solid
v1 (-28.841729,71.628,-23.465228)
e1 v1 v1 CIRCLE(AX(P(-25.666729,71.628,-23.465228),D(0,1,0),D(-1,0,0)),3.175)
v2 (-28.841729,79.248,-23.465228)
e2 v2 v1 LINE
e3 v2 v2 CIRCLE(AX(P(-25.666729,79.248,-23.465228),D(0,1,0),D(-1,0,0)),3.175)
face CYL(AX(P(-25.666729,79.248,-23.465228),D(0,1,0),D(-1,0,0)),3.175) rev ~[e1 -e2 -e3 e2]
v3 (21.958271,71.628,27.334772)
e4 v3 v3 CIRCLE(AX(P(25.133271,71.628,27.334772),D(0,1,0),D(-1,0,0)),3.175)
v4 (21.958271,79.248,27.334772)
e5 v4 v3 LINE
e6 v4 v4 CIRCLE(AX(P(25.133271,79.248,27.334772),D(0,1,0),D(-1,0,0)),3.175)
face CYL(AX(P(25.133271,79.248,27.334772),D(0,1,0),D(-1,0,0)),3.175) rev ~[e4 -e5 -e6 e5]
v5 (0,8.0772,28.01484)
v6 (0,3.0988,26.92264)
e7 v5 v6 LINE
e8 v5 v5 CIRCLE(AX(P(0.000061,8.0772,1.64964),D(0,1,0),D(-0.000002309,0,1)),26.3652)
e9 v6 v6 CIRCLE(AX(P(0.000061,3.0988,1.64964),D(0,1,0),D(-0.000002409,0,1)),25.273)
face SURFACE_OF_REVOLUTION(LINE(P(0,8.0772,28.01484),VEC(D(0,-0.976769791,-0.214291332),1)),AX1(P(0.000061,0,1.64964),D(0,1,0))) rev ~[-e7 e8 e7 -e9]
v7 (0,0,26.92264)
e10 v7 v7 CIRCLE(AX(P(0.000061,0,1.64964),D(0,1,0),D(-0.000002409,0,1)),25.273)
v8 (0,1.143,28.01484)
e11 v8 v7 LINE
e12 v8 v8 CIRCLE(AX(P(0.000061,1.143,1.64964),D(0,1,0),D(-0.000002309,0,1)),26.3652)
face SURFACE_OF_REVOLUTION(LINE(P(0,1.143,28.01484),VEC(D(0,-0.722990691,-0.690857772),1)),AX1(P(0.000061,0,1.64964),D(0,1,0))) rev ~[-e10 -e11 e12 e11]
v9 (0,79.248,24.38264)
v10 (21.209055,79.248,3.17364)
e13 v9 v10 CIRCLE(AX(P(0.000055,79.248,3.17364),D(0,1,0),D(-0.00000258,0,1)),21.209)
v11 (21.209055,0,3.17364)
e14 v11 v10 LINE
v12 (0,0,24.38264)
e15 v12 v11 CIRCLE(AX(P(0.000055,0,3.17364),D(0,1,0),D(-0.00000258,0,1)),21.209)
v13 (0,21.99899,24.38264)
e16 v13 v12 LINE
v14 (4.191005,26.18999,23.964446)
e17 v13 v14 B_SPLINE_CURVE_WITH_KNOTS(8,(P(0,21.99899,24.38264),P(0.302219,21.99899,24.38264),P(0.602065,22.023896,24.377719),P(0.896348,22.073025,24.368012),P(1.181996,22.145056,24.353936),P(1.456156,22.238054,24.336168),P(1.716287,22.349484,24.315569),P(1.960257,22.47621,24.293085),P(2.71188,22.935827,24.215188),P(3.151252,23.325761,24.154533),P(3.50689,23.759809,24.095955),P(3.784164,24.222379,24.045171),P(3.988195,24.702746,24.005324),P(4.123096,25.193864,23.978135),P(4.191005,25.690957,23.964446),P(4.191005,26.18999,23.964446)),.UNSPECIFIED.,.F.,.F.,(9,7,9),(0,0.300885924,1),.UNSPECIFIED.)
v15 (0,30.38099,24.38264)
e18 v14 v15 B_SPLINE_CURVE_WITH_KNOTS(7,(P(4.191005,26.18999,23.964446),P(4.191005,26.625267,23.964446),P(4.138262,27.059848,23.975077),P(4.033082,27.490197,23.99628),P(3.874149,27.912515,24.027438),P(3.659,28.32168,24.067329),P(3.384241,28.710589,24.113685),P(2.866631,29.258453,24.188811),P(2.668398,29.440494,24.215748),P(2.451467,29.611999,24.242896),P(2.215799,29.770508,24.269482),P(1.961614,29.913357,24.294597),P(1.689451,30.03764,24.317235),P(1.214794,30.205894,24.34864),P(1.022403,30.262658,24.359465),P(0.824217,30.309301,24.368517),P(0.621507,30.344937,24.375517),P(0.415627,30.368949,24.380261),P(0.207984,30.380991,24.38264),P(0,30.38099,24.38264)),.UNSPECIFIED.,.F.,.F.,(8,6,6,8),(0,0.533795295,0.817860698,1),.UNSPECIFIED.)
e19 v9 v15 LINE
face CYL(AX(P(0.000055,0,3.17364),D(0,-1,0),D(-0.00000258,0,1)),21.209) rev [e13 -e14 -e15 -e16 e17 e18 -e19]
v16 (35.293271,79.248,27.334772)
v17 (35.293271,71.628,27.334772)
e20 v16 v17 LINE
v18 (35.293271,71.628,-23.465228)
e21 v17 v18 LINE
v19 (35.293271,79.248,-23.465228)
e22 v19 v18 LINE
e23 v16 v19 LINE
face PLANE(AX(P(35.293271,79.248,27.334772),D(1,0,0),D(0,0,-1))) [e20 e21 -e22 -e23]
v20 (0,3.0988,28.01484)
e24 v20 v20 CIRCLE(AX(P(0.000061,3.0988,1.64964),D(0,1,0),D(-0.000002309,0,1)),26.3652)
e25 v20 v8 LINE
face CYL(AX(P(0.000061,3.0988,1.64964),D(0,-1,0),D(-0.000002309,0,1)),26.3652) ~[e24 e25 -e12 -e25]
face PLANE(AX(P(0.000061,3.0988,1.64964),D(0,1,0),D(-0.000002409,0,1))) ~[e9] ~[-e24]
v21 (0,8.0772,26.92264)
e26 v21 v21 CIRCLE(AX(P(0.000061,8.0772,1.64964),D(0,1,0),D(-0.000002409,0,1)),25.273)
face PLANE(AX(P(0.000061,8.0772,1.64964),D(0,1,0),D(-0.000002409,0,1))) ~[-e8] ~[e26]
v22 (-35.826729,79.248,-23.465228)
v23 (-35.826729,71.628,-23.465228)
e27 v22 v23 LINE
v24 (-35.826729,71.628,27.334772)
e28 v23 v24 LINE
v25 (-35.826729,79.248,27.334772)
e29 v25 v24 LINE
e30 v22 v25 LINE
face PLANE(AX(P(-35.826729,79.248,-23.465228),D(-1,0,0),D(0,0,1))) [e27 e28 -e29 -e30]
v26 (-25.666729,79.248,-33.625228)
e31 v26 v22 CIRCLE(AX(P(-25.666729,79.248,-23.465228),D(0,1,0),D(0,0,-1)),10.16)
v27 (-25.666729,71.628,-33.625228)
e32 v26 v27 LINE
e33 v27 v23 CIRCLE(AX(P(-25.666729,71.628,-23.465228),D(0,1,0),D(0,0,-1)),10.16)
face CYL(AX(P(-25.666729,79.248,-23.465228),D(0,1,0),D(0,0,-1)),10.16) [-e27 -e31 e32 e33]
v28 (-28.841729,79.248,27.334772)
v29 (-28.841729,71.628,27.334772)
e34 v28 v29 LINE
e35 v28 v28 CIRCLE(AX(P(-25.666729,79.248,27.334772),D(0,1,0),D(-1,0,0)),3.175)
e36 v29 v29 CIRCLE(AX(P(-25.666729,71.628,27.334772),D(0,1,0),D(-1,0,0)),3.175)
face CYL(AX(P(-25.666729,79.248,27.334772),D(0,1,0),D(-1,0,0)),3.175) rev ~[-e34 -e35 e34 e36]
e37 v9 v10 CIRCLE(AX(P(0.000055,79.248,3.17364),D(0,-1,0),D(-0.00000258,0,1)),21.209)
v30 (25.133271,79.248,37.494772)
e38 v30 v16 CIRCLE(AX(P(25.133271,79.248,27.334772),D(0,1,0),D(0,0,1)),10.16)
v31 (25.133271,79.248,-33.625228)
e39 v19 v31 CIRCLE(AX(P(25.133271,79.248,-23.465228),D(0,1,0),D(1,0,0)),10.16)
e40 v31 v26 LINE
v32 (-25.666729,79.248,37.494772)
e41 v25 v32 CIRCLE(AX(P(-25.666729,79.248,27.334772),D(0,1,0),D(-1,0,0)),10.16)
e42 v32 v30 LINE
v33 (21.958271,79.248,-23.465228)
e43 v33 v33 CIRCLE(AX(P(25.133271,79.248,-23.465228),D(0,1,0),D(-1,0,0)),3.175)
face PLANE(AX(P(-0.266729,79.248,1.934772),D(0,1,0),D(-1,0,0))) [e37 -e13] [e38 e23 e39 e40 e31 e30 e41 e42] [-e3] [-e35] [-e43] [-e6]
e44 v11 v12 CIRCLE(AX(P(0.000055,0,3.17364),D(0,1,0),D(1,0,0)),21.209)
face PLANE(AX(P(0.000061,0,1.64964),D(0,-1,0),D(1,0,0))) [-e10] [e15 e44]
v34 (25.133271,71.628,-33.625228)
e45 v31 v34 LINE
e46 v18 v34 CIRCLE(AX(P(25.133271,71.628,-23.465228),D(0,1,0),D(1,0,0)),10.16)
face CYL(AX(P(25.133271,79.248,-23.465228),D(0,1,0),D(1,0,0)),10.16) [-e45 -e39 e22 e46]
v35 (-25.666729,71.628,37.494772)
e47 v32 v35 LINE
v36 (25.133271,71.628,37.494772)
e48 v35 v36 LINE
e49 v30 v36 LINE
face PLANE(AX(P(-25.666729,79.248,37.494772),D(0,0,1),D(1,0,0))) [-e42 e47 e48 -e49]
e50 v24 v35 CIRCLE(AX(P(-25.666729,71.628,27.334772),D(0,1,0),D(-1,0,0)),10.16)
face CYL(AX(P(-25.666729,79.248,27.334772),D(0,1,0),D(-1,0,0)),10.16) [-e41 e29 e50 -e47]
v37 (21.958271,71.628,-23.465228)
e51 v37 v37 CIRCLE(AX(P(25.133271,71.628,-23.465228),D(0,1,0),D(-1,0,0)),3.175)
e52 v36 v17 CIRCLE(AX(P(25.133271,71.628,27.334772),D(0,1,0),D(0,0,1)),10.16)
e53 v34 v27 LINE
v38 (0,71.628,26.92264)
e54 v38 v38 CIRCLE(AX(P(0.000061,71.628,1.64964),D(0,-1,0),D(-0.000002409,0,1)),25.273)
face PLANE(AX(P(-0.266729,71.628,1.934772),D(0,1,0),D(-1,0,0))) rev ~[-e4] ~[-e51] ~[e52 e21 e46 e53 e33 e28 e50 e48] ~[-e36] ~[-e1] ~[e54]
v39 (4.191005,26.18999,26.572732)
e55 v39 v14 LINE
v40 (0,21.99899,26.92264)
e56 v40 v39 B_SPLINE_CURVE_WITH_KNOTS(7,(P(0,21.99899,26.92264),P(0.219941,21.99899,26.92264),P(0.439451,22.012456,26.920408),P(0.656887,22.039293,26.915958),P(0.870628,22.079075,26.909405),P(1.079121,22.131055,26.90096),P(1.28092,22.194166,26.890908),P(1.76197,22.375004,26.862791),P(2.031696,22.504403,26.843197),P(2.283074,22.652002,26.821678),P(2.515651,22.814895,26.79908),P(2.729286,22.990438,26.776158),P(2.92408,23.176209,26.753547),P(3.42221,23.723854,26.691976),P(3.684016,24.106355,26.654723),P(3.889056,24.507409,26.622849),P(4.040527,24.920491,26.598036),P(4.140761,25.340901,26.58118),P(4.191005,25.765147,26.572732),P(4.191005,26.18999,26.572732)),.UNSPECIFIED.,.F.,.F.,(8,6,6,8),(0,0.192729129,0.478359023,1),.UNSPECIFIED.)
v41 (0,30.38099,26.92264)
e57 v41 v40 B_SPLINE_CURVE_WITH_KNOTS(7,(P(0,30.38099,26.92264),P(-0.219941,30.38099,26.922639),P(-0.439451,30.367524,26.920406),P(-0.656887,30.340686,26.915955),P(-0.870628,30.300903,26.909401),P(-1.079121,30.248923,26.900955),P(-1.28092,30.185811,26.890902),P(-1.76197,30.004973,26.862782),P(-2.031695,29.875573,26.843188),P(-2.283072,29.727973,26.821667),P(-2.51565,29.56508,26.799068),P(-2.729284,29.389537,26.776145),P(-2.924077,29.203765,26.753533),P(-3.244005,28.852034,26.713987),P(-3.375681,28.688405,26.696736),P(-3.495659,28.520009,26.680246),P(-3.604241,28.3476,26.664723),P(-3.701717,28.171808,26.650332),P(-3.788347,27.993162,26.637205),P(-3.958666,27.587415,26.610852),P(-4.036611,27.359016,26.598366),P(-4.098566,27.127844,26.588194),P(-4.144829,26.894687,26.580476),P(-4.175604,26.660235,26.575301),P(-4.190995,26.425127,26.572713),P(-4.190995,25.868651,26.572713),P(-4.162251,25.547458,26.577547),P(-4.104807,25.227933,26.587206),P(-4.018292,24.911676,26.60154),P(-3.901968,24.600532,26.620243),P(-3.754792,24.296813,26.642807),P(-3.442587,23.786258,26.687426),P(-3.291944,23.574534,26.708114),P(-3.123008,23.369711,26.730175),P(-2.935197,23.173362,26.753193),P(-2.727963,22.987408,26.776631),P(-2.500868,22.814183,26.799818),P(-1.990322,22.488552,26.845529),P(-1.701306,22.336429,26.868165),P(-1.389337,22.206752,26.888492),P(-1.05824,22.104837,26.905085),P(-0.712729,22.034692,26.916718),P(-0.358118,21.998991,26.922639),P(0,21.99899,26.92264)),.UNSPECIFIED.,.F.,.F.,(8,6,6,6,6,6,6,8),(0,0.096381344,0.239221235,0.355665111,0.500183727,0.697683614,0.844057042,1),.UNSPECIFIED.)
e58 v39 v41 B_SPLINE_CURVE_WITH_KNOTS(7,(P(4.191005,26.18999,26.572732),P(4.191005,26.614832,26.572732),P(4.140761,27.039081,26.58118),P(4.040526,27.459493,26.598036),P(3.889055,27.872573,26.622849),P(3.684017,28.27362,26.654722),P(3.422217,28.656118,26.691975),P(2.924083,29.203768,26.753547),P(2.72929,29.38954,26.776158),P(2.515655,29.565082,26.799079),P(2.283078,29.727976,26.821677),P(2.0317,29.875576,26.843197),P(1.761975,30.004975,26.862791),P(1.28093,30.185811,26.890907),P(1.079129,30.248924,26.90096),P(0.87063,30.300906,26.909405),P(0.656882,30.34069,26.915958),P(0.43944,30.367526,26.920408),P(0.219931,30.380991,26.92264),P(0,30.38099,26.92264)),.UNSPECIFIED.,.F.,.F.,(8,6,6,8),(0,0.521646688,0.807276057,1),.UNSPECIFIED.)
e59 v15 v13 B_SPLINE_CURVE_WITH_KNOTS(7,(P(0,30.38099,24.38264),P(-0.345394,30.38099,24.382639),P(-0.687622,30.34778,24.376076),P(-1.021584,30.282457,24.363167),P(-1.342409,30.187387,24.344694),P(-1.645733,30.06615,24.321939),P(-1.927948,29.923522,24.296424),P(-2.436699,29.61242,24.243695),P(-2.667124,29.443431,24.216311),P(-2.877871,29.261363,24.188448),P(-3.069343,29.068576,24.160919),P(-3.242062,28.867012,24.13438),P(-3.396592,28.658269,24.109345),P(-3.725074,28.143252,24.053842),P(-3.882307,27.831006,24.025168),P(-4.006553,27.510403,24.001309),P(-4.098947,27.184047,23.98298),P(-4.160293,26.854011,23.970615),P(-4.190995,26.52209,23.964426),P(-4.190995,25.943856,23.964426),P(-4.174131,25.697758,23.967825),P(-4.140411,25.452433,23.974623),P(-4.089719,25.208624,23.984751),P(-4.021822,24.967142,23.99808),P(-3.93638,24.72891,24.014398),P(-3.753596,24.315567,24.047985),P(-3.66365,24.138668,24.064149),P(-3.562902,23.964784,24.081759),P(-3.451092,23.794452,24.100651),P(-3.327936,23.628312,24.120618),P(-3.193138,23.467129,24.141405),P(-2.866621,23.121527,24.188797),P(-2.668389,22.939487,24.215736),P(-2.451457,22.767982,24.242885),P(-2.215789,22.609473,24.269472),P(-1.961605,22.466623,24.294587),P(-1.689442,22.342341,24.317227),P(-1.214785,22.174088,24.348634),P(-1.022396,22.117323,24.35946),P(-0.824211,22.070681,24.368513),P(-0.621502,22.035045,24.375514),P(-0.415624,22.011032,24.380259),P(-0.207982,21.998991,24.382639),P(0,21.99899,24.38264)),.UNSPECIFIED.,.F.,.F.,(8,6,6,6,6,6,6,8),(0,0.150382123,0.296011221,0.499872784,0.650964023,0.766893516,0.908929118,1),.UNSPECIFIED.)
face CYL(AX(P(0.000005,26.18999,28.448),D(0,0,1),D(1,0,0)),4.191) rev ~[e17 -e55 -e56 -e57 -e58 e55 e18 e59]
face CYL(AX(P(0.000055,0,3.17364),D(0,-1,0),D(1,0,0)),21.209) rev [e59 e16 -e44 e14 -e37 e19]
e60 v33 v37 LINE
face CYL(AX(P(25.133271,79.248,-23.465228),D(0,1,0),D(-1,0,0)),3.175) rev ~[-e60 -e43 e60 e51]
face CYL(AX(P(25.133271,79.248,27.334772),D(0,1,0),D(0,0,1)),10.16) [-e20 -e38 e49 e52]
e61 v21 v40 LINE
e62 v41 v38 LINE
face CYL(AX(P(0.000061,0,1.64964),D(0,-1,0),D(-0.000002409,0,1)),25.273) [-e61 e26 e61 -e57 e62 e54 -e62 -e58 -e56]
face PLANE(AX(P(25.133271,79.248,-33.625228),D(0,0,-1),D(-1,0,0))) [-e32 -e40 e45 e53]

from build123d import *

# Parameters (mm, degrees)
F1_DEPTH  = 79.248
F3_DEPTH  = 11.2522
F6_R      = 3.175
F6_R_2    = 25.273
F6_R_3    = 21.209
F7_DEPTH  = 7.62
F9_R      = 4.191
F10_DEPTH = 7.874


# Not quite as in the source:
# - ends of sketch curves that miss each other by under 0.0002 mm in the source are joined
# - a feature names something its author has since deleted; it is built from what else it names


with BuildPart() as f1:
    # F0 (on Front) → F1 (new body)
    with BuildSketch(Plane.XZ):
        with BuildLine():
            ThreePointArc((25.2730608729, 1.6496396764), (17.870749032, 19.5203708791), (0, 26.9226396763))
            ThreePointArc((0, 26.9226396763), (-17.8706272863, -16.2210915263), (25.2730608729, 1.6496396764))
        make_face()
        with BuildLine():
            ThreePointArc((0, 24.3826396763), (14.9970630949, 18.1706867446), (21.2090547187, 3.1736396764))
            ThreePointArc((21.2090547187, 3.1736396764), (-14.9969536575, -11.8234073918), (0, 24.3826396763))
        make_face(mode=Mode.SUBTRACT)
    extrude(amount=-F1_DEPTH)

    # F2 (on face) → F3 (cut)
    with BuildSketch(Plane.XZ):
        with BuildLine():
            Line((24.13, 26.9226396763), (0, 26.9226396763))
            ThreePointArc((0, 26.9226396763), (8.7356829544, 25.3648971249), (16.3944827501, 20.8836579854))
            Line((16.3944827501, 20.8836579854), (24.13, 20.8835978808))
            Line((24.13, 20.8835978808), (24.13, 26.9226396763))
        make_face()
        with BuildLine():
            ThreePointArc((-16.3944315191, 20.8835978808), (-8.7356618013, 25.3648600709), (0, 26.9226396763))
            Line((0, 26.9226396763), (-24.13, 26.9226396763))
            Line((-24.13, 26.9226396763), (-24.13, 20.8835978808))
            Line((-24.13, 20.8835978808), (-16.3944315191, 20.8835978808))
        make_face()
    extrude(amount=-F3_DEPTH, mode=Mode.SUBTRACT)

    # F4 (on Right) → F5 (revolve)
    with BuildSketch(Plane.YZ):
        Polygon((1.143, 28.0148396764), (0, 26.9226396764), (3.0988, 26.9226396764), (3.0988, 28.0148396764), align=None)
        Polygon((8.0772, 28.0148396764), (3.0988, 26.9226396764), (8.0772, 26.9226396764), align=None)
    revolve(axis=Axis((6.08729e-05, 0, 1.6496396764), (0, 1, 0)))

    # F6 (on face) → F7 (join)
    with BuildSketch(Plane(origin=(0, 79.248, 0), x_dir=(-1, 0, 0), z_dir=(0, 1, 0))):
        with BuildLine():
            Line((-25.1332705243, -33.6252276427), (25.6667294757, -33.6252276427))
            ThreePointArc((25.6667294757, -33.6252276427), (32.8509343726, -30.6494325395), (35.8267294757, -23.4652276427))
            Line((35.8267294757, -23.4652276427), (35.8267294757, 27.3347723573))
            ThreePointArc((35.8267294757, 27.3347723573), (32.8509343726, 34.5189772542), (25.6667294757, 37.4947723573))
            Line((25.6667294757, 37.4947723573), (-25.1332705243, 37.4947723573))
            ThreePointArc((-25.1332705243, 37.4947723573), (-32.3174754212, 34.5189772542), (-35.2932705243, 27.3347723573))
            Line((-35.2932705243, 27.3347723573), (-35.2932705243, -23.4652276427))
            ThreePointArc((-35.2932705243, -23.4652276427), (-32.3174754212, -30.6494325395), (-25.1332705243, -33.6252276427))
        make_face()
        with Locations((-25.1332705243, -23.4652276427)):
            Circle(F6_R, mode=Mode.SUBTRACT)
        with Locations((-6.08729e-05, 1.6496396764)):
            Circle(F6_R_2, mode=Mode.SUBTRACT)
        with Locations((25.6667294757, -23.4652276427)):
            Circle(F6_R, mode=Mode.SUBTRACT)
        with Locations((-25.1332705243, 27.3347723573)):
            Circle(F6_R, mode=Mode.SUBTRACT)
        with Locations((25.6667294757, 27.3347723573)):
            Circle(F6_R, mode=Mode.SUBTRACT)
        with Locations((-6.08729e-05, 1.6496396764)):
            Circle(F6_R_2)
        with Locations((-5.47187e-05, 3.1736396764)):
            Circle(F6_R_3, mode=Mode.SUBTRACT)
    extrude(amount=-F7_DEPTH)

    # F9 (on offset) → F10 (cut)
    with BuildSketch(Plane.XY.offset(28.448)):
        with Locations((4.8756e-06, 26.1899903387)):
            Circle(F9_R)
    extrude(amount=-F10_DEPTH, mode=Mode.SUBTRACT)


solid = f1.part
